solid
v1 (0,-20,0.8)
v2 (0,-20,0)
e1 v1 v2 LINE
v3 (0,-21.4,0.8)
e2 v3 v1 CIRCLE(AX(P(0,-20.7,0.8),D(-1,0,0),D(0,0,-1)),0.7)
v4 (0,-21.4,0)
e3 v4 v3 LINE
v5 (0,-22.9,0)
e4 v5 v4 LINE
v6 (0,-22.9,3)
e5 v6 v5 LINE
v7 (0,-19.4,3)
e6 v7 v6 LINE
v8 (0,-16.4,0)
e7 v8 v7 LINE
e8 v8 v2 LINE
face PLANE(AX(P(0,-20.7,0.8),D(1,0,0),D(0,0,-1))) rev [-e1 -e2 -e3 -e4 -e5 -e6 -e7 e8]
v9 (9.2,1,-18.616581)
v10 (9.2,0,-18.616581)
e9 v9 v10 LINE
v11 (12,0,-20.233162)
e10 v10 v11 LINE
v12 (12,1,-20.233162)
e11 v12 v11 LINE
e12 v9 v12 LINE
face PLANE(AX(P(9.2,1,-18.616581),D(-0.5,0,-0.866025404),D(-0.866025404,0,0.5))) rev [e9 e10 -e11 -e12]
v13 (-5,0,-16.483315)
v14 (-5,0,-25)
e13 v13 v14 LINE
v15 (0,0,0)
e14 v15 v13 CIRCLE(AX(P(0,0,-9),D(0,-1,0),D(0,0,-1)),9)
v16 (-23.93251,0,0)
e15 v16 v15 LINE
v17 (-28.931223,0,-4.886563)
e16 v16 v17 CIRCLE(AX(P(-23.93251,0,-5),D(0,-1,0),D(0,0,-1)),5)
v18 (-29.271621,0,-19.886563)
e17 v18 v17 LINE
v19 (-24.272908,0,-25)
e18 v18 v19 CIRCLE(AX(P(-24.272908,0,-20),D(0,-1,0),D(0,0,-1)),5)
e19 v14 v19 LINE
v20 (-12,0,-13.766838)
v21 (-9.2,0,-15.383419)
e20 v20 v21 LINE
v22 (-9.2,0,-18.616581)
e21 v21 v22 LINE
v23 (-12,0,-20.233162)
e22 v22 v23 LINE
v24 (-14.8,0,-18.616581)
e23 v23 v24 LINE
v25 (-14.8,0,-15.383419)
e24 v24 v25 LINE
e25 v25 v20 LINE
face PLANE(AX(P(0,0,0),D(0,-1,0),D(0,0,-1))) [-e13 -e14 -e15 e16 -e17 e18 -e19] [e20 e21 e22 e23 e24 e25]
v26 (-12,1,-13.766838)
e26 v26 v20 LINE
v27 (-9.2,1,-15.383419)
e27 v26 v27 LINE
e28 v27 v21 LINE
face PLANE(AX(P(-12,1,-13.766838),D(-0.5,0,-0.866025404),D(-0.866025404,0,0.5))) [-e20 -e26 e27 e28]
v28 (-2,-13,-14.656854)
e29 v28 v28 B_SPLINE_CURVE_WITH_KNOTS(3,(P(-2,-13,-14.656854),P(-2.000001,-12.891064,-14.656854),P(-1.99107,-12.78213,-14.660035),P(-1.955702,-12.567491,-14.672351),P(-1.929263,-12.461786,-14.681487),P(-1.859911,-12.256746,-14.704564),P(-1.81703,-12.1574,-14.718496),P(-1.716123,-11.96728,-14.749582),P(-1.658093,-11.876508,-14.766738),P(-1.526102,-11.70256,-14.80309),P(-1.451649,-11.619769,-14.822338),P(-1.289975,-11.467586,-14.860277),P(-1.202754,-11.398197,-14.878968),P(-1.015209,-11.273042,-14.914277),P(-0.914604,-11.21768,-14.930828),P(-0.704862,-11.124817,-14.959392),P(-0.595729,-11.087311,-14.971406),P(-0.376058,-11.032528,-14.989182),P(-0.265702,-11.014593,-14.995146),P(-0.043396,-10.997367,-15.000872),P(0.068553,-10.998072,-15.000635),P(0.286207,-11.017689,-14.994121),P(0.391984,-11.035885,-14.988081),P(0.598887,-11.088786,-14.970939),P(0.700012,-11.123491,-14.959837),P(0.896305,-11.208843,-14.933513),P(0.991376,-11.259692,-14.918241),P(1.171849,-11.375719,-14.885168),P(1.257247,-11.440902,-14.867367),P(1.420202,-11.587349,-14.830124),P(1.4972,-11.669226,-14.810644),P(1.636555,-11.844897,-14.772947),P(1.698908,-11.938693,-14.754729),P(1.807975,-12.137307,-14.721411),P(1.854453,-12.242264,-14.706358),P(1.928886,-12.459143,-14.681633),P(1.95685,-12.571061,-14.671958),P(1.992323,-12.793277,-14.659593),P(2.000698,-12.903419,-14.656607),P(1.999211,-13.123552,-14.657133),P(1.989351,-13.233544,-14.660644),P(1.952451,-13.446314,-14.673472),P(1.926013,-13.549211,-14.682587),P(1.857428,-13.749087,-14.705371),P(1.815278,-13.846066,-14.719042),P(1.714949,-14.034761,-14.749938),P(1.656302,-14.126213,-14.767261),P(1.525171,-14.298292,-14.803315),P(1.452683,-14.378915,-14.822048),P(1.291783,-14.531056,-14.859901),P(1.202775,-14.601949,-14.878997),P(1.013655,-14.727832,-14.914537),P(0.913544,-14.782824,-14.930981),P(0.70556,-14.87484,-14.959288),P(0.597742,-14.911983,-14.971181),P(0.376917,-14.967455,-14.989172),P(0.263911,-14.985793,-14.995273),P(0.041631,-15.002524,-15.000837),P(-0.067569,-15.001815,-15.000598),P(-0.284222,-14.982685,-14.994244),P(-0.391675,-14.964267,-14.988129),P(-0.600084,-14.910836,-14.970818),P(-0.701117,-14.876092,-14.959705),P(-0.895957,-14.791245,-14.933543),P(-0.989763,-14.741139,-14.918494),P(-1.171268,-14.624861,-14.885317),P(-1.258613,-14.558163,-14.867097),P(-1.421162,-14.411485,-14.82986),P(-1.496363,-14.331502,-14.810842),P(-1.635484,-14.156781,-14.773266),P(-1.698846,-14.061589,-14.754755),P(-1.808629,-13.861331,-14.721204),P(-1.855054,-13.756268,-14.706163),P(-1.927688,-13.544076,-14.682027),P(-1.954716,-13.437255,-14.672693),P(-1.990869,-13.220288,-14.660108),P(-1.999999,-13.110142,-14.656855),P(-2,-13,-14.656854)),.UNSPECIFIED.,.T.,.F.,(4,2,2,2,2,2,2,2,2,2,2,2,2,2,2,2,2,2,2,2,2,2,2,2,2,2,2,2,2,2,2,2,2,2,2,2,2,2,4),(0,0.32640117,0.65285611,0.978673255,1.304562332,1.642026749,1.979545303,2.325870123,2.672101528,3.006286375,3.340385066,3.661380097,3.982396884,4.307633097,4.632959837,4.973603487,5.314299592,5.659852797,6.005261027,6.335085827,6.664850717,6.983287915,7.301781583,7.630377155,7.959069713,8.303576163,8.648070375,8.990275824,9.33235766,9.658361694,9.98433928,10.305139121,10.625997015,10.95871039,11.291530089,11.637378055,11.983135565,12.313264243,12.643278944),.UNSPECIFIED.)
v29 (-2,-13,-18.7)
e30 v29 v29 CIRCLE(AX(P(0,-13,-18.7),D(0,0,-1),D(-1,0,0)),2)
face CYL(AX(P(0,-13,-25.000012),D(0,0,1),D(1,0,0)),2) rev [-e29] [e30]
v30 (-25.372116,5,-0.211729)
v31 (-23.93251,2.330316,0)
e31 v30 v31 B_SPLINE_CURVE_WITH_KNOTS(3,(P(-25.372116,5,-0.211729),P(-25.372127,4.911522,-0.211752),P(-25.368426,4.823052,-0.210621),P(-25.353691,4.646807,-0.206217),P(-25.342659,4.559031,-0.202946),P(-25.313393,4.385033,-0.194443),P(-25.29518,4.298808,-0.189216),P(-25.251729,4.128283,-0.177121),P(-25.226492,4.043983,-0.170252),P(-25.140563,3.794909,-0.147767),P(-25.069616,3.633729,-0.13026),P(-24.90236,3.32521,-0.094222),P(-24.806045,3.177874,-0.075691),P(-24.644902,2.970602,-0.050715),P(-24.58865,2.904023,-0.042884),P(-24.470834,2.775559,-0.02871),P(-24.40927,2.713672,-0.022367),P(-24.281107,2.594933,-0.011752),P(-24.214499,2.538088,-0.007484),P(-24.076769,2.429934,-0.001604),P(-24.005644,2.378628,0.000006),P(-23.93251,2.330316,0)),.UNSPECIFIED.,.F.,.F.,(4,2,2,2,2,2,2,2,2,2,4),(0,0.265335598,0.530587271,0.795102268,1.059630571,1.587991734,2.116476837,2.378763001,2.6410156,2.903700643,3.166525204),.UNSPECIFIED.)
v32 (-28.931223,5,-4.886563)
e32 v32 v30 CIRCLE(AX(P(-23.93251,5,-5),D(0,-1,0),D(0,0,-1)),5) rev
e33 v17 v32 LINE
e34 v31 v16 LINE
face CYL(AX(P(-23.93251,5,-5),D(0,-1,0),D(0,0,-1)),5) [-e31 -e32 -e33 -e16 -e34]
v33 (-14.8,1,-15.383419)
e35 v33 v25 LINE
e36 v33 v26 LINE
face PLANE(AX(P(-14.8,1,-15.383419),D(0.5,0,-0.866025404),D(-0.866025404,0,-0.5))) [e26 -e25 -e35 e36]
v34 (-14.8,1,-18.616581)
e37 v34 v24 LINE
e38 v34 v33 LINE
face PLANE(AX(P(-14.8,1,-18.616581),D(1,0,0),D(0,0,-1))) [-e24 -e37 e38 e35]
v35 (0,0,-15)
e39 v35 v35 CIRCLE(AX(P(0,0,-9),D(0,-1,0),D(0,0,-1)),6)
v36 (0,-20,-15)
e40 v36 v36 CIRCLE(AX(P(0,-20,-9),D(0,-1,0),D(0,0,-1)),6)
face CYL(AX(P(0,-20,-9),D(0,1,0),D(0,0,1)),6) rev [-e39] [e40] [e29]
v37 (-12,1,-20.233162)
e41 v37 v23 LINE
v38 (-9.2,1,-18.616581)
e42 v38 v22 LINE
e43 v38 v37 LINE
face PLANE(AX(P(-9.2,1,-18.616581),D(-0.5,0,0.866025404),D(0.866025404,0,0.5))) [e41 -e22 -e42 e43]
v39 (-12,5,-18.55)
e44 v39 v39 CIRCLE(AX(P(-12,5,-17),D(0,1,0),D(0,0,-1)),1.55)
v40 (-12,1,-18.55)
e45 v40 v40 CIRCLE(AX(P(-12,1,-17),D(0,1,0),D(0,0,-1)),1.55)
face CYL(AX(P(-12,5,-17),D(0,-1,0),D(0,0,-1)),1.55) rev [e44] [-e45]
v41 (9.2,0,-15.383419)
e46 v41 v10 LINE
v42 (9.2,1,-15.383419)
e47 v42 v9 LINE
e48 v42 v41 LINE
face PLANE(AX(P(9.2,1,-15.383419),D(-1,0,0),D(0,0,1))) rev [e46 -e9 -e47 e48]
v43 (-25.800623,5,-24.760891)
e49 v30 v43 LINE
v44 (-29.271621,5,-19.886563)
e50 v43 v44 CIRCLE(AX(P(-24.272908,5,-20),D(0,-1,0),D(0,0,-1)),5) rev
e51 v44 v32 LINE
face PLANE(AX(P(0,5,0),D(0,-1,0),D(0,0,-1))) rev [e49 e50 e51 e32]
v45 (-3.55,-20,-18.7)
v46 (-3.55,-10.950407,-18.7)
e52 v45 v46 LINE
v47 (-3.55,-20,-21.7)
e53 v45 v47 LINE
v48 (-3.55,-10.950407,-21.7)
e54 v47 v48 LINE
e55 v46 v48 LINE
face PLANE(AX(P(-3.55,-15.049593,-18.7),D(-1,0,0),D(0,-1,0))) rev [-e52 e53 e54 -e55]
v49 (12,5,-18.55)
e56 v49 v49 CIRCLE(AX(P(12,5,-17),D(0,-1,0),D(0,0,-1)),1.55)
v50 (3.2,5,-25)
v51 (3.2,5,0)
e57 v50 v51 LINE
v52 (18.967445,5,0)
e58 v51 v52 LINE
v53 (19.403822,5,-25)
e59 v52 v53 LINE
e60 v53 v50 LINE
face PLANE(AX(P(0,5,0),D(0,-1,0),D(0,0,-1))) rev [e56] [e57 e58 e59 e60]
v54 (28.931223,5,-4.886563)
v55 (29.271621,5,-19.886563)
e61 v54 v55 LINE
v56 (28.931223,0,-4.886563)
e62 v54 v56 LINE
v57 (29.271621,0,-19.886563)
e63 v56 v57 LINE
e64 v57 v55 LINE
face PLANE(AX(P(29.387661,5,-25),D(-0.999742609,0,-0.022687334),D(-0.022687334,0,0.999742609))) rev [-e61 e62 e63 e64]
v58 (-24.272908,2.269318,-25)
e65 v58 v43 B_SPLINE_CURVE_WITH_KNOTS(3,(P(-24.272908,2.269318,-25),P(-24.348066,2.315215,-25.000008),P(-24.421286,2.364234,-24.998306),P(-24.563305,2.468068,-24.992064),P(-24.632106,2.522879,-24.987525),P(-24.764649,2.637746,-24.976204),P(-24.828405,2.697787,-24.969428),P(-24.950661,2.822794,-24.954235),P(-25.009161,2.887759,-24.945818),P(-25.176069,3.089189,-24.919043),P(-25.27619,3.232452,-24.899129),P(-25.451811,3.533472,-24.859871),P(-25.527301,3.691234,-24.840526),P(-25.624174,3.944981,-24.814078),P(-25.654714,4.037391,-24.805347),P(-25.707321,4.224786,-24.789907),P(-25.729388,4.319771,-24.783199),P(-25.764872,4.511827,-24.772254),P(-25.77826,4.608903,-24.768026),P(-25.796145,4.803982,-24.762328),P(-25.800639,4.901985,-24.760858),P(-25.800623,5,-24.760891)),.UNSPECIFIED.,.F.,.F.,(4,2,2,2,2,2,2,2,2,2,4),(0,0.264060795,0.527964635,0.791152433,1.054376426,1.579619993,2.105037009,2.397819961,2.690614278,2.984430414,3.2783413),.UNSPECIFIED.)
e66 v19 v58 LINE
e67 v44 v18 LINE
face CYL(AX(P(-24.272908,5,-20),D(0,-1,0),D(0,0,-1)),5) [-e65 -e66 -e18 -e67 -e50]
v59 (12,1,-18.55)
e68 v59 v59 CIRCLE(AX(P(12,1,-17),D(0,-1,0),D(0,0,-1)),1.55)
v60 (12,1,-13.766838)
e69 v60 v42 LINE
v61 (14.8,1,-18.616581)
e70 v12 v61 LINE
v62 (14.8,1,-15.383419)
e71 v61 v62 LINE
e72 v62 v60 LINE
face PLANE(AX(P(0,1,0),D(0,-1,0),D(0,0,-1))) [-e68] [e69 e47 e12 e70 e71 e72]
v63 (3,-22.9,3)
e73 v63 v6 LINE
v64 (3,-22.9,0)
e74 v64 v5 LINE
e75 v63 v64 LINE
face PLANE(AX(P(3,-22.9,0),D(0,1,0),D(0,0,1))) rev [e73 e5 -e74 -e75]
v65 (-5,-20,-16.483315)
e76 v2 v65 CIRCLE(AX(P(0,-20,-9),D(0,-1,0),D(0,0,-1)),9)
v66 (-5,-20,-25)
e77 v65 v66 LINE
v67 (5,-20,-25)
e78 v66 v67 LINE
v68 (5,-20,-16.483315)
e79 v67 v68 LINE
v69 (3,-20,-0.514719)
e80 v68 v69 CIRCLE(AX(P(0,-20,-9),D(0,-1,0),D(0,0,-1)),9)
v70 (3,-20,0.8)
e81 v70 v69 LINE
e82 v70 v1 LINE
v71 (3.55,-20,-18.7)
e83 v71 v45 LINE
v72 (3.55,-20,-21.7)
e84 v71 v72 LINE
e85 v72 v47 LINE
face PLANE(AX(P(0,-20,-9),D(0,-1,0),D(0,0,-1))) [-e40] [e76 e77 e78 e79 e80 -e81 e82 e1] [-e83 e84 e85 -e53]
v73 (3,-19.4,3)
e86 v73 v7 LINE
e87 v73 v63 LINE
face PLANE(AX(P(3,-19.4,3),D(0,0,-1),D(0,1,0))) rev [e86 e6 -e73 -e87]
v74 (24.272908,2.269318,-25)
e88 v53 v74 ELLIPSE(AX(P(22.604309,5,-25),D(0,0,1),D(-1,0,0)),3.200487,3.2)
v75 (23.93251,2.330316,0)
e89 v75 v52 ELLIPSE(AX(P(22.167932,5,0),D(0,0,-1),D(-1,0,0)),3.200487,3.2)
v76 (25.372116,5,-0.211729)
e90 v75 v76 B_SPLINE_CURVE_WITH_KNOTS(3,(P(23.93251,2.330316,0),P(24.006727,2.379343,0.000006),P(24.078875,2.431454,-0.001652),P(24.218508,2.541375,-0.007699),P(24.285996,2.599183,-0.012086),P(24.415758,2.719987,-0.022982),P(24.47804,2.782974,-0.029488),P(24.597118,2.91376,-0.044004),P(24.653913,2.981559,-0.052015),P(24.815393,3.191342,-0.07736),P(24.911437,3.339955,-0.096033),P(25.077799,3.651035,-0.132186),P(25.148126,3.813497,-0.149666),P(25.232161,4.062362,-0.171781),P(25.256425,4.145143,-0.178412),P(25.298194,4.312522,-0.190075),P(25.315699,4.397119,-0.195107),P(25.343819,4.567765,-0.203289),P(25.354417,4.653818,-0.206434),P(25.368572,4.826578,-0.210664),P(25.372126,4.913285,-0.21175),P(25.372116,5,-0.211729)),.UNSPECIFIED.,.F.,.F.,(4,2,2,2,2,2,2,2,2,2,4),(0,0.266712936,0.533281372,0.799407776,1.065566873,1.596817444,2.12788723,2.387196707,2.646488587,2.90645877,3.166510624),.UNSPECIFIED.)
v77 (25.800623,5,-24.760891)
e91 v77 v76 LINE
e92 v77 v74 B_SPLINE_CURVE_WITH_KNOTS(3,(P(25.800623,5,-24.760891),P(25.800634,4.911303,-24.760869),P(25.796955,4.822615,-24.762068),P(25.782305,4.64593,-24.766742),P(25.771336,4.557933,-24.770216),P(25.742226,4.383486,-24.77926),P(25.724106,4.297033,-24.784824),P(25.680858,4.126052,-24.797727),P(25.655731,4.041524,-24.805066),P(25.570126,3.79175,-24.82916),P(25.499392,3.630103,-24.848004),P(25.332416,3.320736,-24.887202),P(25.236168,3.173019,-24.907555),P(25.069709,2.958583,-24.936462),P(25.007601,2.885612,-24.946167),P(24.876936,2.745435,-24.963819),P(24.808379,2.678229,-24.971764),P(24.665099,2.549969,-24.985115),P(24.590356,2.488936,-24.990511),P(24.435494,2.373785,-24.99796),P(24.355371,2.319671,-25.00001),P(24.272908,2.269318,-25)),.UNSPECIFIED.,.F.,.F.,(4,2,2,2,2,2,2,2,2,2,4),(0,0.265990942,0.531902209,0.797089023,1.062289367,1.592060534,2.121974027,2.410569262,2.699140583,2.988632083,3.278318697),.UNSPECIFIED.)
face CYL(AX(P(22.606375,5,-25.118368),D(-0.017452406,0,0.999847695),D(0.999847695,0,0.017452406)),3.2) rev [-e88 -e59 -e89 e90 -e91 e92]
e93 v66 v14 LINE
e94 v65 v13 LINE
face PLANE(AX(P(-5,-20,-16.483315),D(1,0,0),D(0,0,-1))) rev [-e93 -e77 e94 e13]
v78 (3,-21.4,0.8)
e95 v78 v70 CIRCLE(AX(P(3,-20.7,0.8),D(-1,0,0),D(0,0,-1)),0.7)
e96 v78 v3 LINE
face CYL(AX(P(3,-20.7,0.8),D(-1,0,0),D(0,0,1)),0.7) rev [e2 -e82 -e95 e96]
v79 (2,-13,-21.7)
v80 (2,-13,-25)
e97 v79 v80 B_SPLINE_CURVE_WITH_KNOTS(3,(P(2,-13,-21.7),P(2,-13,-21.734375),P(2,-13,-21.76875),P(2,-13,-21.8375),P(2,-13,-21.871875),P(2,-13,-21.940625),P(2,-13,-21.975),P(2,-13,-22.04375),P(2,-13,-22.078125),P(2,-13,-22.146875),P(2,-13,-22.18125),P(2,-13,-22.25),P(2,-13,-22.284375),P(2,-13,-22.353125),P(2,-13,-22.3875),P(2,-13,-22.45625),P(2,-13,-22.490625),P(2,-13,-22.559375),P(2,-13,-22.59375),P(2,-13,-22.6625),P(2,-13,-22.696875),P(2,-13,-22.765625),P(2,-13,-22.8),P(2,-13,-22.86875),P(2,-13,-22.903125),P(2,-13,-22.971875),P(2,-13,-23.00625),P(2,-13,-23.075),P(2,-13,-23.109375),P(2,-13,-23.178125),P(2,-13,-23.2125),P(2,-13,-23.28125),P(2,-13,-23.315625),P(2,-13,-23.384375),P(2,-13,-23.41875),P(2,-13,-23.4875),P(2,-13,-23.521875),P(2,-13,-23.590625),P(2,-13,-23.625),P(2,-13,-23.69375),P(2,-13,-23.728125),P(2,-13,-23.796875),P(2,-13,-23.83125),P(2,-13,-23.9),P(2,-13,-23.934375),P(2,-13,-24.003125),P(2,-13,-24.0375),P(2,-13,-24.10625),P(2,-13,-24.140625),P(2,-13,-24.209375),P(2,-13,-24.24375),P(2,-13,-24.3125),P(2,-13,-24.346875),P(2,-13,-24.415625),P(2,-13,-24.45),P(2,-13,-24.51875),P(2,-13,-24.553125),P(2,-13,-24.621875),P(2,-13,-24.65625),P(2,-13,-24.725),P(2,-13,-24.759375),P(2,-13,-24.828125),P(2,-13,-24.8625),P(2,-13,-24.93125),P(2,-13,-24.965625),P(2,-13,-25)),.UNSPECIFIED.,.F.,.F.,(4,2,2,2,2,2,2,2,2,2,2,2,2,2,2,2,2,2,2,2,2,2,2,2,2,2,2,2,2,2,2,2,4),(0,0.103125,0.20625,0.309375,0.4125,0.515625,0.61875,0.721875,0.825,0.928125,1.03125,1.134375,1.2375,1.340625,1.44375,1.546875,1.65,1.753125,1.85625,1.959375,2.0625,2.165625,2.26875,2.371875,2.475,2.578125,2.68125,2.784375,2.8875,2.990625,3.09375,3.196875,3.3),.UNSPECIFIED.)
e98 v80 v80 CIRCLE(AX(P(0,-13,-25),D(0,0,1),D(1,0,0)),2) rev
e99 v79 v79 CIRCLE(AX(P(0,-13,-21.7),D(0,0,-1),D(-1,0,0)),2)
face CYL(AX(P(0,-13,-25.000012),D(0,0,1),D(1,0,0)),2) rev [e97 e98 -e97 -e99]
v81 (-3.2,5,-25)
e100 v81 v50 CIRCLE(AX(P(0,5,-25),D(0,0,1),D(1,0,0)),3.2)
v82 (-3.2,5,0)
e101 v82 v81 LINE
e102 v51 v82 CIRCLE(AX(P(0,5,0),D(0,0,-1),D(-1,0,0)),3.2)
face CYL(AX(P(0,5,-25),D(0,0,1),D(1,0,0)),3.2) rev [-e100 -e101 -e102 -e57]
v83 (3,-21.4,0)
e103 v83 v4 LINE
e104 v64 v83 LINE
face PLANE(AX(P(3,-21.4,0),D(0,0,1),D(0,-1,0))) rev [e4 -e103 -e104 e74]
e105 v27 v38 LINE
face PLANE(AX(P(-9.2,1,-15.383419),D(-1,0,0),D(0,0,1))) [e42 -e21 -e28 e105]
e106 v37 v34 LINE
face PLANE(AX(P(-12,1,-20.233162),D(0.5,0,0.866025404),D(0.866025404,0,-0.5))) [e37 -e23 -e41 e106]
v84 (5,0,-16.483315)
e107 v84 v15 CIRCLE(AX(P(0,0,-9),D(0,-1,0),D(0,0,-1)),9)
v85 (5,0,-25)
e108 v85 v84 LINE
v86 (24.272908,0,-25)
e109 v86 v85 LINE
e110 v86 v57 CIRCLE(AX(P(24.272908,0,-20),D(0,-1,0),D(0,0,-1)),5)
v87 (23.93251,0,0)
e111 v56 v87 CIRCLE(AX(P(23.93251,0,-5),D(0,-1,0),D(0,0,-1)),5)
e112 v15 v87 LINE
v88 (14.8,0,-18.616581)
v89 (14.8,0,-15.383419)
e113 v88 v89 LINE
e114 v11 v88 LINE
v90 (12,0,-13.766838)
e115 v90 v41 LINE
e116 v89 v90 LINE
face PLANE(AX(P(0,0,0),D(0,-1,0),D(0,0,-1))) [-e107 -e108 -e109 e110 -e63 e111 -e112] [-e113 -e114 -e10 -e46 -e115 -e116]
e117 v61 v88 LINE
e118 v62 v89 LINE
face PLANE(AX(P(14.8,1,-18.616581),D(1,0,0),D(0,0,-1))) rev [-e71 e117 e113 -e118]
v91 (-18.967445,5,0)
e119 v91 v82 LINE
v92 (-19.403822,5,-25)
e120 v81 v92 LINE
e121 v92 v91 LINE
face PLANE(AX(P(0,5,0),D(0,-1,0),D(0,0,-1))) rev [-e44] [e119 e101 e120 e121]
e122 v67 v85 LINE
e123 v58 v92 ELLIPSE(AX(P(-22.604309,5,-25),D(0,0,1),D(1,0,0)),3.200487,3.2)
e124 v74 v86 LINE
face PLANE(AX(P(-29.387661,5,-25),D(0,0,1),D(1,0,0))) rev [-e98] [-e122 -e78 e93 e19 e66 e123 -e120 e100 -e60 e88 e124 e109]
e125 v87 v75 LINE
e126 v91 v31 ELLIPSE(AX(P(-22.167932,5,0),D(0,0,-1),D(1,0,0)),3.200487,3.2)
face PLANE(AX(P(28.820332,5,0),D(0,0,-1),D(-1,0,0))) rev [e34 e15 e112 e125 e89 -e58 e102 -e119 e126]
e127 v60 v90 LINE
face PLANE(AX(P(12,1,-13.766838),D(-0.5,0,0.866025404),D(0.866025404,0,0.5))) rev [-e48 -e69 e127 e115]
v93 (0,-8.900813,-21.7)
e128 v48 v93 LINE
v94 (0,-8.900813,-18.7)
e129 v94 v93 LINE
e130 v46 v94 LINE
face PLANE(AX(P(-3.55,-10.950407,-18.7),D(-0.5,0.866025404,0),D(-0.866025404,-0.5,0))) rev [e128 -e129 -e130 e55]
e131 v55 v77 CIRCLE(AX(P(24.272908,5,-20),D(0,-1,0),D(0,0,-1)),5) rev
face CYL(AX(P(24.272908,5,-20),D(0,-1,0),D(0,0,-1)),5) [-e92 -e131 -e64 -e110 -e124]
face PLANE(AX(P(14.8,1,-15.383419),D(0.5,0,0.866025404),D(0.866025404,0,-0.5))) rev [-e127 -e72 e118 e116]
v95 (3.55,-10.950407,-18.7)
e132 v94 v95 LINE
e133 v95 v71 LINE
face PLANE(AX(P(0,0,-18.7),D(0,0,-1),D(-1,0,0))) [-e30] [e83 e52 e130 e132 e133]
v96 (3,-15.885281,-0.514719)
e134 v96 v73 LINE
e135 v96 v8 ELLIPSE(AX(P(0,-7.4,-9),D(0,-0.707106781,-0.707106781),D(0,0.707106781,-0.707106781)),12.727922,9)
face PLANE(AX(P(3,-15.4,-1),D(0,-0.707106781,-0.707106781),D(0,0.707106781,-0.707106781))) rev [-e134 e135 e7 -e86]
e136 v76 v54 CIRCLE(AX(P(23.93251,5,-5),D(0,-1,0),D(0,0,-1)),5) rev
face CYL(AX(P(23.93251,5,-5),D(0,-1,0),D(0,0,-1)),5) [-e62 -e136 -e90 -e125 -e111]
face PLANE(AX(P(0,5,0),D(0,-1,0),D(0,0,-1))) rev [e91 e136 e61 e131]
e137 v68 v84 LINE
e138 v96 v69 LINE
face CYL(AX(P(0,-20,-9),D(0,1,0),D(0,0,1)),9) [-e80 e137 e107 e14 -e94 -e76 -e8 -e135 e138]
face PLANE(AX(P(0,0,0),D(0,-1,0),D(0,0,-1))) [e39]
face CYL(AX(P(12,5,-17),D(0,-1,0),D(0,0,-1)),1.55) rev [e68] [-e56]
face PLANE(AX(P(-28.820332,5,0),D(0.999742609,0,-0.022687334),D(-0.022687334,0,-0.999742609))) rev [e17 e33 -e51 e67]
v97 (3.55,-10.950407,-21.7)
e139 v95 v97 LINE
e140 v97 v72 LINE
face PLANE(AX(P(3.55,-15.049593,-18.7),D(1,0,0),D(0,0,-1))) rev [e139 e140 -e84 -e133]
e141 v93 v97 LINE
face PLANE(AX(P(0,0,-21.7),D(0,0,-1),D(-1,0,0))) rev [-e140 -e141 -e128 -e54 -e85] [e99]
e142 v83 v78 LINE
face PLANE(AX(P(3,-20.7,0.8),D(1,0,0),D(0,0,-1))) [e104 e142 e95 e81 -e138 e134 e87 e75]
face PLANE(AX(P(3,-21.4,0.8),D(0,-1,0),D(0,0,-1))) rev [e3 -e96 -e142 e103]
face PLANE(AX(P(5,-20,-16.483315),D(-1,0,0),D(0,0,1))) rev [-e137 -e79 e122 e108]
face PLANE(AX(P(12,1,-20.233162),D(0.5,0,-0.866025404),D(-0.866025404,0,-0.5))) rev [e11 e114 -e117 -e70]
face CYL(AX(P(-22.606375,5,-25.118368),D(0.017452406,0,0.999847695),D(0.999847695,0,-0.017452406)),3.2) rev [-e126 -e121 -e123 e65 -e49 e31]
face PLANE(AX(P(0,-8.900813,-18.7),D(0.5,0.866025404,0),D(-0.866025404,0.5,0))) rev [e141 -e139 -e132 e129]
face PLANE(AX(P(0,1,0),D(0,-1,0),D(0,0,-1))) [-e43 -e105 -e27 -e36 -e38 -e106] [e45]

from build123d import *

# Parameters (mm, degrees)
BOSS_EXTRUDE1_DEPTH             = 5
SKETCH2_R                       = 9
SKETCH2_R_2                     = 6
BOSS_EXTRUDE2_DEPTH             = 20
SKETCH3_W                       = 10
SKETCH3_H                       = 8.516685226
BOSS_EXTRUDE3_DEPTH             = 20
SKETCH5_R                       = 3.2
CUT_EXTRUDE1_DEPTH              = 44.458424087
CIRPATTERN1_COUNT               = 2
CIRPATTERN1_ANGLE               = 1
CIRPATTERN1_THE_OTHER_WAY_COUNT = 2
CIRPATTERN1_THE_OTHER_WAY_ANGLE = 1
CUT_EXTRUDE2_REACH              = 45.458
CUT_EXTRUDE2_END_RADIUS         = 6
SKETCH6_R                       = 2
CUT_EXTRUDE2_DIRECTION_2_DEPTH  = 44.458424087
CUT_EXTRUDE3_START              = -3.3
CUT_EXTRUDE3_DEPTH              = 3
BOSS_EXTRUDE4_DEPTH             = 3
FILLET1_START                   = -20
FILLET1_DEPTH                   = 25
CUT_EXTRUDE4_DEPTH              = 1
SKETCH10_R                      = 1.55
CUT_EXTRUDE5_DEPTH              = 46.311291634


with BuildPart() as part:
    # Sketch1 → Boss-Extrude1 (new body)
    with BuildSketch(Plane(origin=(0, 0, 0), x_dir=(1, 0, 0), z_dir=(0, 1, 0))):
        Polygon((-28.820331722, 0), (-29.387661087, 25), (29.387661087, 25), (28.820331722, 0), align=None)
    extrude(amount=BOSS_EXTRUDE1_DEPTH)

    # Sketch2 → Boss-Extrude2 (add)
    with BuildSketch(Plane.XZ):
        with Locations(Location((0, -9, 0), (0, 0, 90))):
            Circle(SKETCH2_R)
        with Locations(Location((0, -9, 0), (0, 0, 270))):
            Circle(SKETCH2_R_2, mode=Mode.SUBTRACT)
    extrude(amount=BOSS_EXTRUDE2_DEPTH)

    # Sketch3 → Boss-Extrude3 (add)
    with BuildSketch(Plane.XZ):
        with Locations((0, -20.741657387)):
            Rectangle(SKETCH3_W, SKETCH3_H)
    extrude(amount=BOSS_EXTRUDE3_DEPTH)

    # Sketch5 → Cut-Extrude1 (cut, symmetric)
    with BuildSketch(Plane.XY):
        with Locations((0, 5)):
            Circle(SKETCH5_R)
    cut_extrude1 = extrude(amount=CUT_EXTRUDE1_DEPTH, both=True, mode=Mode.SUBTRACT)

    # CirPattern1: Cut-Extrude1 ×2 about axis
    cirpattern1_axis = Axis((0, 0, 1270), (0, 1, 0))
    for i in range(1, CIRPATTERN1_COUNT):
        add(cut_extrude1.rotate(cirpattern1_axis, i * CIRPATTERN1_ANGLE / (CIRPATTERN1_COUNT - 1)), mode=Mode.SUBTRACT)

    # CirPattern1 the other way: Cut-Extrude1 ×2 about axis
    cirpattern1_the_other_way_axis = Axis((0, 0, 1270), (0, -1, 0))
    for i in range(1, CIRPATTERN1_THE_OTHER_WAY_COUNT):
        add(cut_extrude1.rotate(cirpattern1_the_other_way_axis, i * CIRPATTERN1_THE_OTHER_WAY_ANGLE / (CIRPATTERN1_THE_OTHER_WAY_COUNT - 1)), mode=Mode.SUBTRACT)

    # Cut-Extrude2: up to this cylinder (the profile starts outside it)
    cut_extrude2_end = Plane(origin=(0, -13, -9), z_dir=(0, 1, 0)) * Cylinder(CUT_EXTRUDE2_END_RADIUS, 103.916, mode=Mode.PRIVATE)
    # Sketch6 → Cut-Extrude2 (cut, up to the surface)
    with BuildSketch(Plane(origin=(0, 0, -25), x_dir=(-1, 0, 0), z_dir=(0, 0, -1)), mode=Mode.PRIVATE) as cut_extrude2_sk1:
        with Locations(Location((0, -13, 0), (0, 0, 180))):
            Circle(SKETCH6_R)
    cut_extrude2_tool1 = extrude(cut_extrude2_sk1.sketch, amount=-CUT_EXTRUDE2_REACH, mode=Mode.PRIVATE) - cut_extrude2_end
    add(cut_extrude2_tool1.solids().sort_by_distance((0, -13, -25))[0], mode=Mode.SUBTRACT)

    # Sketch6 → Cut-Extrude2 direction 2 (cut)
    with BuildSketch(Plane(origin=(0, 0, -25), x_dir=(-1, 0, 0), z_dir=(0, 0, -1))):
        with Locations(Location((0, -13, 0), (0, 0, 180))):
            Circle(SKETCH6_R)
    extrude(amount=CUT_EXTRUDE2_DIRECTION_2_DEPTH, mode=Mode.SUBTRACT)

    # Sketch7 → Cut-Extrude3 (cut)
    with BuildSketch(Plane(origin=(0, 0, -25), x_dir=(-1, 0, 0), z_dir=(0, 0, -1)).offset(CUT_EXTRUDE3_START)):
        Polygon((-3.55, -15.049593456), (-3.55, -20), (3.55, -20), (3.55, -15.049593456), (3.55, -10.950406544), (0, -8.900813089), (-3.55, -10.950406544), align=None)
    extrude(amount=-CUT_EXTRUDE3_DEPTH, mode=Mode.SUBTRACT)

    # Sketch8 → Boss-Extrude4 (add)
    with BuildSketch(Plane(origin=(0, 0, 0), x_dir=(0, 0, -1), z_dir=(1, 0, 0))):
        with BuildLine():
            Line((1, -15.4), (-3, -19.4))
            Line((-3, -19.4), (-3, -22.9))
            Line((-3, -22.9), (0, -22.9))
            Line((0, -22.9), (0, -21.4))
            Line((0, -21.4), (-0.8, -21.4))
            ThreePointArc((-0.8, -21.4), (-1.5, -20.7), (-0.8, -20))
            Line((-0.8, -20), (1, -20))
            Line((1, -20), (1, -15.4))
        make_face()
    extrude(amount=BOSS_EXTRUDE4_DEPTH)

    # Fillet1: read off the stored shape, not the designer's step
    # Fillet1 outline → Fillet1 (cut)
    with BuildSketch(Plane(origin=(0, 0, 0), x_dir=(1, 0, 0), z_dir=(0, 1, 0)).offset(FILLET1_START)):
        with BuildLine():
            Line((28.820331722, 0), (28.931223357, 4.886563332))
            ThreePointArc((28.931223357, 4.886563332), (27.427708206, 1.424585105), (23.93251031, 0))
            Line((23.93251031, 0), (28.820331722, 0))
        make_face()
        with BuildLine():
            ThreePointArc((24.272907929, 25), (27.848322824, 23.495197896), (29.271620976, 19.886563332))
            Line((29.271620976, 19.886563332), (29.387661087, 25))
            Line((29.387661087, 25), (24.272907929, 25))
        make_face()
        with BuildLine():
            Line((-28.820331722, 0), (-23.93251031, 0))
            ThreePointArc((-23.93251031, 0), (-27.427708206, 1.424585105), (-28.931223357, 4.886563332))
            Line((-28.931223357, 4.886563332), (-28.820331722, 0))
        make_face()
        with BuildLine():
            ThreePointArc((-29.271620976, 19.886563332), (-27.848322824, 23.495197896), (-24.272907929, 25))
            Line((-24.272907929, 25), (-29.387661087, 25))
            Line((-29.387661087, 25), (-29.271620976, 19.886563332))
        make_face()
    extrude(amount=FILLET1_DEPTH, mode=Mode.SUBTRACT)

    # Sketch9 → Cut-Extrude4 (cut)
    with BuildSketch(Plane.XZ):
        Polygon((12, -20.233161507), (14.8, -18.616580754), (14.8, -15.383419246), (12, -13.766838493), (9.2, -15.383419246), (9.2, -18.616580754), align=None)
    cut_extrude4 = extrude(amount=-CUT_EXTRUDE4_DEPTH, mode=Mode.SUBTRACT)

    # Sketch10 → Cut-Extrude5 (cut, through all)
    with BuildSketch(Plane.XZ.offset(-1)):
        with Locations(Location((12, -17, 0), (0, 0, 270))):
            Circle(SKETCH10_R)
    cut_extrude5 = extrude(amount=-CUT_EXTRUDE5_DEPTH, mode=Mode.SUBTRACT)

    # Mirror1: Cut-Extrude4, Cut-Extrude5 across plane
    add(cut_extrude4.mirror(Plane(origin=(0, 0, 0), x_dir=(0, 0, 1), z_dir=(1, 0, 0))), mode=Mode.SUBTRACT)
    add(cut_extrude5.mirror(Plane(origin=(0, 0, 0), x_dir=(0, 0, 1), z_dir=(1, 0, 0))), mode=Mode.SUBTRACT)


solid = part.part
